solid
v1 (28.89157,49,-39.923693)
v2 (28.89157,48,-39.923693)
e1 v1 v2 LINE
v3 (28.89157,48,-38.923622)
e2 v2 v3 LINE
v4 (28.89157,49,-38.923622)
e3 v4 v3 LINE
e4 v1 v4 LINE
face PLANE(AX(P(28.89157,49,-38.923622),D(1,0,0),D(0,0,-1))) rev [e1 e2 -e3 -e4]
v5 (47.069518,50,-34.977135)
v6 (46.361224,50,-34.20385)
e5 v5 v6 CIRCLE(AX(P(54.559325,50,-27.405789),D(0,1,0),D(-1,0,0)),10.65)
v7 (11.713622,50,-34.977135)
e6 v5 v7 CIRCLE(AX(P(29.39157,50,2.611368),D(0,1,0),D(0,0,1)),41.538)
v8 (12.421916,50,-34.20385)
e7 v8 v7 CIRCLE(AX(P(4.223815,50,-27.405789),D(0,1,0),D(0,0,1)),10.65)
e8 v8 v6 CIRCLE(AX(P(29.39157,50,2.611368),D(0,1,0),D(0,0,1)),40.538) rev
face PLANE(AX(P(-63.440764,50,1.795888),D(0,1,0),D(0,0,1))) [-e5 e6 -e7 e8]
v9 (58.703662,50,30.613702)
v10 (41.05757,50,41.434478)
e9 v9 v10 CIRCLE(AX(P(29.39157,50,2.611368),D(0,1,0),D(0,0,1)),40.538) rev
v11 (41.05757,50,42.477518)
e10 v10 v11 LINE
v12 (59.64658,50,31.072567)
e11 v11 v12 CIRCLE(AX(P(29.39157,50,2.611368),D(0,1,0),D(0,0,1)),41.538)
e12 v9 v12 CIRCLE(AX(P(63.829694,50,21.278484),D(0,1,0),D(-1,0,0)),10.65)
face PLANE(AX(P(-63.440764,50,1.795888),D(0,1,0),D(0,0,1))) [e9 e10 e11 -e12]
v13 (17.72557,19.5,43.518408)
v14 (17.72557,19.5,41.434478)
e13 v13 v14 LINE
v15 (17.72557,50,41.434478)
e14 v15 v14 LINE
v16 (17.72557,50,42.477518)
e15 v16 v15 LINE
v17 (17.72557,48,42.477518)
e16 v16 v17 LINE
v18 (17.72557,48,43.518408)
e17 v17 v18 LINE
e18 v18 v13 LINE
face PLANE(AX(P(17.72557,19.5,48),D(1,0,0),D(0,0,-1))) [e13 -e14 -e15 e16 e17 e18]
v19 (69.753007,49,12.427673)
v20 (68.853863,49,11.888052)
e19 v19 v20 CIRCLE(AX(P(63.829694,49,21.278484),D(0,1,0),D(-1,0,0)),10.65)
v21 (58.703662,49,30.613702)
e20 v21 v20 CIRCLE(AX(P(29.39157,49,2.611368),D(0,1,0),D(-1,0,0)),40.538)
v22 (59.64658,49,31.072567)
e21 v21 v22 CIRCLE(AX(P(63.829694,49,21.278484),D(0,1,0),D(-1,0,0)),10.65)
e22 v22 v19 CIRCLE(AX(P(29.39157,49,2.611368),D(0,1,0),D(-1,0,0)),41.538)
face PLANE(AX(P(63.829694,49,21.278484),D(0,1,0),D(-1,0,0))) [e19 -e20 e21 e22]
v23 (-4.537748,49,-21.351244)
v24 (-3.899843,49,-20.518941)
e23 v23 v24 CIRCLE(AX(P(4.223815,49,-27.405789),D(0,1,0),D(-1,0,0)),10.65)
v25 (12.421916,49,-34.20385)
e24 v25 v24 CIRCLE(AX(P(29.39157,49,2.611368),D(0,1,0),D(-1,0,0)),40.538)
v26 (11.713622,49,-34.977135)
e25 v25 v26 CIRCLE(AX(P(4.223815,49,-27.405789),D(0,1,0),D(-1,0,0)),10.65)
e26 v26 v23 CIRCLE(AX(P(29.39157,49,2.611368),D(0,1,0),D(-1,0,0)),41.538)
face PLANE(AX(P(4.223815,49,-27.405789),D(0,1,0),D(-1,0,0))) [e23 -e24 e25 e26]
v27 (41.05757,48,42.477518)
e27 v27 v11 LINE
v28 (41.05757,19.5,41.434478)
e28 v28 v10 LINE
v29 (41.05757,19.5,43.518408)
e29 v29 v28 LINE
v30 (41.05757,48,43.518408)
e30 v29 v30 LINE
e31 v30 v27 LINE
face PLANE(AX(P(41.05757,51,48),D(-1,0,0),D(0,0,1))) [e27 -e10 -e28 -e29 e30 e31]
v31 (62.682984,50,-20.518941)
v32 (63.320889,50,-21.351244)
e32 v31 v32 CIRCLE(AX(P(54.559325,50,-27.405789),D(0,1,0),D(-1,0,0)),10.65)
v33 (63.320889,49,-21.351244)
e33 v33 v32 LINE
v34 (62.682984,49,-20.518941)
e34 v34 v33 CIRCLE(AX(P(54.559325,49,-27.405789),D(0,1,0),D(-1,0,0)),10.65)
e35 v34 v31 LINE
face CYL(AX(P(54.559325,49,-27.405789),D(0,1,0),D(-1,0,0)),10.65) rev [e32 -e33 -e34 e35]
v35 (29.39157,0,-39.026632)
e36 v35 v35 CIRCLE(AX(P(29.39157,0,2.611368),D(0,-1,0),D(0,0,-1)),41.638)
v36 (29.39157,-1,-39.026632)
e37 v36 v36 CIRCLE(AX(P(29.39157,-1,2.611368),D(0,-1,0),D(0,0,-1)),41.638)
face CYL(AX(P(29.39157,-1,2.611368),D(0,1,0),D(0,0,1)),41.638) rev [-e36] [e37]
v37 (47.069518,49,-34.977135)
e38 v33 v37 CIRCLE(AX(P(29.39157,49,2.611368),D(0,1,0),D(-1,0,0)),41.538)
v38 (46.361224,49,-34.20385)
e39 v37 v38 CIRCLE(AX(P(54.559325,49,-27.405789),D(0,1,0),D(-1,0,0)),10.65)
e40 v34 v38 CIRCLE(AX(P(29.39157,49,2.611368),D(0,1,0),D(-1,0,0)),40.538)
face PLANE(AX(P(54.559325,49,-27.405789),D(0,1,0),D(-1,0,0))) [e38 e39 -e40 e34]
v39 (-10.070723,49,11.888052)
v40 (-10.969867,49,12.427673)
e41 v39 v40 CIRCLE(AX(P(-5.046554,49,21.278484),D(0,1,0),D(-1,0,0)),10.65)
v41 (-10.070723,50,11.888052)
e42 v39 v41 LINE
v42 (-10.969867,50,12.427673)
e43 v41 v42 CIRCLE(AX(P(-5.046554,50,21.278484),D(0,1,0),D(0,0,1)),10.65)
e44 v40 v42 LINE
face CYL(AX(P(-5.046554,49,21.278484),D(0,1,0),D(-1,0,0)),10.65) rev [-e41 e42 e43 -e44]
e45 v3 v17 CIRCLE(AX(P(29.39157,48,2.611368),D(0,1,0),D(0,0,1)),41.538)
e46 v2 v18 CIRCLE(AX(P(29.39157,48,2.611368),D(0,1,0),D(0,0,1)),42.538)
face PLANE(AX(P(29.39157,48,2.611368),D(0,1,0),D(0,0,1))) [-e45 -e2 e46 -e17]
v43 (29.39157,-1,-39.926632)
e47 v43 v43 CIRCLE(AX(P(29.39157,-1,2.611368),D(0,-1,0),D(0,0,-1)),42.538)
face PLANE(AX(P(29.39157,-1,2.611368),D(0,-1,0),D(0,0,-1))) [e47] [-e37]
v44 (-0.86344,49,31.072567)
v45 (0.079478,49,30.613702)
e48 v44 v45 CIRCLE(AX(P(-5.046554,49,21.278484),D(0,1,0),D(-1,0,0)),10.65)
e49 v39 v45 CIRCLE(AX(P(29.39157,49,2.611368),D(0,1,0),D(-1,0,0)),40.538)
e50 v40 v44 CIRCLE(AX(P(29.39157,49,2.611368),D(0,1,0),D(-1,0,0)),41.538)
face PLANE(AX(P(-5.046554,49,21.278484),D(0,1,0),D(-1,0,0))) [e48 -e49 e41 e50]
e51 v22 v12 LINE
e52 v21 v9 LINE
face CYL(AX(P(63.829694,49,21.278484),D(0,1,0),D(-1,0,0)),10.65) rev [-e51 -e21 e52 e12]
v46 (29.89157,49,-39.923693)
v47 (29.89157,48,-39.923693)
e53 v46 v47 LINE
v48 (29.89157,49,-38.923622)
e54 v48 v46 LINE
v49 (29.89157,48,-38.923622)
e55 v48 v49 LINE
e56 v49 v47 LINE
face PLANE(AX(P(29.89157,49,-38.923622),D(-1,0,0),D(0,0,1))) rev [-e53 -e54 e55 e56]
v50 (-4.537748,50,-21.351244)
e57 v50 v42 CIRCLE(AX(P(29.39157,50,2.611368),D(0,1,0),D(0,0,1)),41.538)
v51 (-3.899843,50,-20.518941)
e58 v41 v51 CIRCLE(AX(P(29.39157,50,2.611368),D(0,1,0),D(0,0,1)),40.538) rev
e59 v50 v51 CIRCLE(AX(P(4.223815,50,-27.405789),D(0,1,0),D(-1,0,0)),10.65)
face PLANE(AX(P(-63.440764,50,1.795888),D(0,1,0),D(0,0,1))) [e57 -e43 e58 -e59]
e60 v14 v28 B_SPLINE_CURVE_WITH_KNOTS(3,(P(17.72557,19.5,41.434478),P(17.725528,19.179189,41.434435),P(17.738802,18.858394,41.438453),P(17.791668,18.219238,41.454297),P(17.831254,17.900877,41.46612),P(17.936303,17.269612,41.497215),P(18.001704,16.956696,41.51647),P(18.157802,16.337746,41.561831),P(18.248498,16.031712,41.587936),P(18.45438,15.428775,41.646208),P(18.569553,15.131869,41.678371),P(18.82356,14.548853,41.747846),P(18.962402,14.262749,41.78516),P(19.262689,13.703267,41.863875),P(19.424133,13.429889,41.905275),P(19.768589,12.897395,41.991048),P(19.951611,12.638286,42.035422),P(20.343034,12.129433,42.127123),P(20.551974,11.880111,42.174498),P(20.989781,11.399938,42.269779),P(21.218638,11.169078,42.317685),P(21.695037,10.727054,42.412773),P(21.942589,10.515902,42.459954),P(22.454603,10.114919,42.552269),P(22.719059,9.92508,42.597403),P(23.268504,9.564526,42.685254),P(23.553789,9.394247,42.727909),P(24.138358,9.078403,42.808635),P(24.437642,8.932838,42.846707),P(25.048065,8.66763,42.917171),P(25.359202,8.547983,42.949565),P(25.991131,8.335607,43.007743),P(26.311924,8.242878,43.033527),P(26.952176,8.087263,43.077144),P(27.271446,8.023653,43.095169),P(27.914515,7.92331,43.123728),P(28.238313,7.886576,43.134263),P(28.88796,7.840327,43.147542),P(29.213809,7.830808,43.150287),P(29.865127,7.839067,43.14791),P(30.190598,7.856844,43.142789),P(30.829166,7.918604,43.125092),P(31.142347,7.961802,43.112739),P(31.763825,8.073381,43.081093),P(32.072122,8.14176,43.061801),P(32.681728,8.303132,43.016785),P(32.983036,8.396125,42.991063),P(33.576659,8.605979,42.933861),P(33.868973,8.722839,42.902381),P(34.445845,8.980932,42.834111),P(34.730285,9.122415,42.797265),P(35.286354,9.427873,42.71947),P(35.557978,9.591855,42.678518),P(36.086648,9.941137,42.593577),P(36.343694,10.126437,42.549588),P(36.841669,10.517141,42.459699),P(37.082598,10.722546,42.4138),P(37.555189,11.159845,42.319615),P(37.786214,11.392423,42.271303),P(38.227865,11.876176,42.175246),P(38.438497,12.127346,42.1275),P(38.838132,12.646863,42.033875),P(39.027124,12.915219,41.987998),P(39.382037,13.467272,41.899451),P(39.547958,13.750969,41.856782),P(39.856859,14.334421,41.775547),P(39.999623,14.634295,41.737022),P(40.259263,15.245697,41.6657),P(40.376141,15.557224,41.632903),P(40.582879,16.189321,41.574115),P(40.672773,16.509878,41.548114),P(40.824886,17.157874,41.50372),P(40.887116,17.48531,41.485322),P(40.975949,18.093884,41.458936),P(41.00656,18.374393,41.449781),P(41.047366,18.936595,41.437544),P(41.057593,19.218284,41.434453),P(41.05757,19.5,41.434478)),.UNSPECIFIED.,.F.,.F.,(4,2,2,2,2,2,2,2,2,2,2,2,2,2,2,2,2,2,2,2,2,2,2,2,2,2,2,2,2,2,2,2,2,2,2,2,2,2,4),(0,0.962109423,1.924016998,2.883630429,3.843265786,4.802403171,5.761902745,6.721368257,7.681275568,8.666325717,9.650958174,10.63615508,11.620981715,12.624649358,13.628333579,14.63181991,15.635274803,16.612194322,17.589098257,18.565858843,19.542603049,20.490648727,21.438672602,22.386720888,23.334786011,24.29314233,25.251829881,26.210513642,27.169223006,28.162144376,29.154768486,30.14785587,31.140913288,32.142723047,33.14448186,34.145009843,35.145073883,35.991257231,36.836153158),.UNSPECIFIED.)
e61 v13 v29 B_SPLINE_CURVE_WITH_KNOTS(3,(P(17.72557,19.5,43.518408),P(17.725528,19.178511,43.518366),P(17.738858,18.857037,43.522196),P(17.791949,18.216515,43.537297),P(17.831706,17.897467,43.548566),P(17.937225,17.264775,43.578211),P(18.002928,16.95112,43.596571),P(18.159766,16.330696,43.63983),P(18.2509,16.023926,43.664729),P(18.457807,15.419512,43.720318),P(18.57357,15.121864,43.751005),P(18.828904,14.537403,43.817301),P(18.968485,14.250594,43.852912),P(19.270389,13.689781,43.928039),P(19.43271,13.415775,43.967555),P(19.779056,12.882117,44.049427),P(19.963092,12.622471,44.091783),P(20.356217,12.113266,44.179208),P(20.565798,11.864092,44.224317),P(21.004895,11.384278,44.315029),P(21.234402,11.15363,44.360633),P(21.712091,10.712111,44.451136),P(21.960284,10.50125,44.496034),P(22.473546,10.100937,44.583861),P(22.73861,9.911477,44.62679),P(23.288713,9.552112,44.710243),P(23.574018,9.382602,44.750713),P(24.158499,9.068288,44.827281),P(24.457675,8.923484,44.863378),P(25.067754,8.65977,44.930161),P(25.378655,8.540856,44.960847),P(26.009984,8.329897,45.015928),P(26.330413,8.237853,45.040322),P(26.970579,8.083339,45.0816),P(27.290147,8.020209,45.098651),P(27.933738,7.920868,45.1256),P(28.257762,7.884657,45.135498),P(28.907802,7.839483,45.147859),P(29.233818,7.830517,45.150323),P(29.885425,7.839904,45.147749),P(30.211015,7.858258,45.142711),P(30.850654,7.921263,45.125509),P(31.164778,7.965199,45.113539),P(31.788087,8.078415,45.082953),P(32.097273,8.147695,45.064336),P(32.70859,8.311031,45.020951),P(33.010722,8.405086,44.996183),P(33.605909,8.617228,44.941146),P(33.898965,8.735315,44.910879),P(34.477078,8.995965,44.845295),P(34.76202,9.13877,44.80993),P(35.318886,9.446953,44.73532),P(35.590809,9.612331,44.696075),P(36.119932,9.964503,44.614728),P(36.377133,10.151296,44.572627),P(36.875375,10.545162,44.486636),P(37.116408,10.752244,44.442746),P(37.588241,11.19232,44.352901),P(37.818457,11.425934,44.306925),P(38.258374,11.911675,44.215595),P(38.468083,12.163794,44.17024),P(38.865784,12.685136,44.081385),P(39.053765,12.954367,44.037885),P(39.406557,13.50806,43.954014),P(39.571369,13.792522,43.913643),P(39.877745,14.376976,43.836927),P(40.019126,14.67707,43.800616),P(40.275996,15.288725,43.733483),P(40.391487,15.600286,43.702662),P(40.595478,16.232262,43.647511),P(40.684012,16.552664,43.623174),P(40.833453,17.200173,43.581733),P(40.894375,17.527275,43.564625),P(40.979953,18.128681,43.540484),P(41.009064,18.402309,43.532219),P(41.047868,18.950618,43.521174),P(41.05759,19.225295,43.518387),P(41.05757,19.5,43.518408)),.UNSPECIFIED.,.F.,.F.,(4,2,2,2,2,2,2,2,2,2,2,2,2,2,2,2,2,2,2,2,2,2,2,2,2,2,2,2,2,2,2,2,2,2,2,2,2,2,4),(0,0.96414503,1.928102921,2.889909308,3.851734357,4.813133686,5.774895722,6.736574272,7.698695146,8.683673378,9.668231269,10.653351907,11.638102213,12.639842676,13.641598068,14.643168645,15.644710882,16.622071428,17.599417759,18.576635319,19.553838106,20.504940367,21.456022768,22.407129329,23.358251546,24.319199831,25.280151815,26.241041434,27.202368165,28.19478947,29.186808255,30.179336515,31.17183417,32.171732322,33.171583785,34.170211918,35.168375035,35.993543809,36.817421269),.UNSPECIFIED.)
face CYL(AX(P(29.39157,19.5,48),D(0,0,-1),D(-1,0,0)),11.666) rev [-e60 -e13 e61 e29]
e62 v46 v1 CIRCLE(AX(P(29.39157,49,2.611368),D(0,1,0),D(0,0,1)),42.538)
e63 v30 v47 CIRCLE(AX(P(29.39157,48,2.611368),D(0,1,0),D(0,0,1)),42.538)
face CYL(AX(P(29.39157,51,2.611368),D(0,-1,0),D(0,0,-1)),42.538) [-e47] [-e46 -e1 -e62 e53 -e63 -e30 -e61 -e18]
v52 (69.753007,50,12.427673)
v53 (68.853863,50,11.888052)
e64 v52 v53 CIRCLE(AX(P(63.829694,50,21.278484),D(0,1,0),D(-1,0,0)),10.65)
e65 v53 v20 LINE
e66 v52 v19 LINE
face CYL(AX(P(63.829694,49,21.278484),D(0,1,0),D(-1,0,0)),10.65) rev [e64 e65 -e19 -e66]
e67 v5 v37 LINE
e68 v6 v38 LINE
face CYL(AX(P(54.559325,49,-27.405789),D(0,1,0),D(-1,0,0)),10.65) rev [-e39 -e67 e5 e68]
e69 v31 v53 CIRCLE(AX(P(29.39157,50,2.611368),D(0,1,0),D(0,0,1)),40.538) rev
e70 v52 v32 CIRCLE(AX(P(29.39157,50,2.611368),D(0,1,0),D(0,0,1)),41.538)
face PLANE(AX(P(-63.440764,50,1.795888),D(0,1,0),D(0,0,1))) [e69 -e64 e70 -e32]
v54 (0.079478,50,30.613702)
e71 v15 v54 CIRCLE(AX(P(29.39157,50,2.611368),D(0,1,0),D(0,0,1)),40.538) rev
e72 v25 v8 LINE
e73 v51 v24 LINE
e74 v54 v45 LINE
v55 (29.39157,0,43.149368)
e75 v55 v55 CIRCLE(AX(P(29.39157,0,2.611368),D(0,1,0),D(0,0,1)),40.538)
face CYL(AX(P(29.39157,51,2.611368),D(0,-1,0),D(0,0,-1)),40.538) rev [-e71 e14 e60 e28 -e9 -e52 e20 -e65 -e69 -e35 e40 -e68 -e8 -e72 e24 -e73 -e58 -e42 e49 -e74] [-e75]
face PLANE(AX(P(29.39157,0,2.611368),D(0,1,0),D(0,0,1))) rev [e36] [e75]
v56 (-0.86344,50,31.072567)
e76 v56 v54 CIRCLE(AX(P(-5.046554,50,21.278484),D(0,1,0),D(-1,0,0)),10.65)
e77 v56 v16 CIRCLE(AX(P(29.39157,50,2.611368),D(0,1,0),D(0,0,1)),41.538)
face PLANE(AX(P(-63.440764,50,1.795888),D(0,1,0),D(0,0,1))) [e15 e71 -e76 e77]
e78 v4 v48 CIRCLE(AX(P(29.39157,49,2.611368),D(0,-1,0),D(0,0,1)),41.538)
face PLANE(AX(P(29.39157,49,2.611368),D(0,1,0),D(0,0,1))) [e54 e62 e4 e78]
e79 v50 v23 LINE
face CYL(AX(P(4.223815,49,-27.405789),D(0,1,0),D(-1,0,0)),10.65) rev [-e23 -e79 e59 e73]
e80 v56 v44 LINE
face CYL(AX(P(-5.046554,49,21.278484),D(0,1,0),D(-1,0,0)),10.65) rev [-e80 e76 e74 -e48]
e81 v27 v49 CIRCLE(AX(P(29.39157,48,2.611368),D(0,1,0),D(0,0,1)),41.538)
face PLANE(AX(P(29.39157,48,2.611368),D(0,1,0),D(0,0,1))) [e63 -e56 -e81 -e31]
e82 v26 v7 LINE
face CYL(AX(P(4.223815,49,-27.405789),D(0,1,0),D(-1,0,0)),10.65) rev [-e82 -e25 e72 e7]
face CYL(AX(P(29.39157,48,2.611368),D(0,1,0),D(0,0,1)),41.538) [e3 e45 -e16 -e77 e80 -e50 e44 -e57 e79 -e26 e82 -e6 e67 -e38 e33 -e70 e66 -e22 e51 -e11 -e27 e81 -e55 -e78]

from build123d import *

# Parameters (mm, degrees)
SKETCH2_R           = 42.538
SKETCH2_R_2         = 40.538
BOSS_EXTRUDE1_DEPTH = 51
CUT_EXTRUDE1_DEPTH  = 48
CUT_EXTRUDE3_START  = -1
CUT_EXTRUDE3_DEPTH  = 1
SKETCH29_R          = 10.65
CUT_EXTRUDE16_DEPTH = 1
CUT_EXTRUDE17_START = -2
SKETCH30_R          = 42.538
SKETCH30_R_2        = 41.538
CUT_EXTRUDE17_DEPTH = 2
BOSS_EXTRUDE3_DEPTH = 1
BOSS_EXTRUDE4_START = 1
SKETCH33_R          = 42.538
SKETCH33_R_2        = 41.638
BOSS_EXTRUDE4_DEPTH = 1


# Read off the part's stored shape, not the designer's step: Cut-Extrude3
with BuildPart() as part:
    # Sketch2 → Boss-Extrude1 (new body)
    with BuildSketch(Plane(origin=(0, 0, 0), x_dir=(-1, 0, 0), z_dir=(0, 1, 0))):
        with Locations(Location((-29.391570254, 2.611368154, 0), (0, 0, 90))):
            Circle(SKETCH2_R)
        with Locations(Location((-29.391570254, 2.611368154, 0), (0, 0, 90))):
            Circle(SKETCH2_R_2, mode=Mode.SUBTRACT)
    extrude(amount=BOSS_EXTRUDE1_DEPTH)

    # Sketch3 → Cut-Extrude1 (cut)
    with BuildSketch(Plane.XY):
        with BuildLine():
            Line((17.725570254, 19.5), (17.725570254, 51))
            Line((17.725570254, 51), (41.057570254, 51))
            Line((41.057570254, 51), (41.057570254, 19.5))
            ThreePointArc((41.057570254, 19.5), (29.391570254, 7.834), (17.725570254, 19.5))
        make_face()
    extrude(amount=CUT_EXTRUDE1_DEPTH, mode=Mode.SUBTRACT)

    # Cut-Extrude3 outline → Cut-Extrude3 (cut)
    with BuildSketch(Plane(origin=(0, 51, 0), x_dir=(1, 0, 0), z_dir=(0, 1, 0)).offset(CUT_EXTRUDE3_START)):
        with BuildLine():
            ThreePointArc((41.057570254, -43.518407744), (29.391570254, 39.926631846), (17.725570254, -43.518407744))
            Line((17.725570254, -43.518407744), (17.725570254, -41.434478385))
            ThreePointArc((17.725570254, -41.434478385), (29.391570254, 37.926631846), (41.057570254, -41.434478385))
            Line((41.057570254, -41.434478385), (41.057570254, -43.518407744))
        make_face()
    extrude(amount=CUT_EXTRUDE3_DEPTH, mode=Mode.SUBTRACT)

    # Sketch29 → Cut-Extrude16 (cut)
    with BuildSketch(Plane(origin=(58.783140508, 50, 5.222736308), x_dir=(1, 0, 0), z_dir=(0, 1, 0))):
        with Locations((-54.559325107, 32.628524909)):
            Circle(SKETCH29_R)
        with Locations((-4.223815401, 32.628524909)):
            Circle(SKETCH29_R)
        with Locations((5.046553517, -16.055747722)):
            Circle(SKETCH29_R)
        with Locations((-63.829694025, -16.055747722)):
            Circle(SKETCH29_R)
    extrude(amount=-CUT_EXTRUDE16_DEPTH, mode=Mode.SUBTRACT)

    # Sketch30 → Cut-Extrude17 (cut)
    with BuildSketch(Plane(origin=(0, 50, 0), x_dir=(1, 0, 0), z_dir=(0, 1, 0)).offset(CUT_EXTRUDE17_START)):
        with Locations(Location((29.391570254, -2.611368154, 0), (0, 0, 285.917258926))):
            Circle(SKETCH30_R)
        with Locations((29.391570254, -2.611368154)):
            Circle(SKETCH30_R_2, mode=Mode.SUBTRACT)
    extrude(amount=CUT_EXTRUDE17_DEPTH, mode=Mode.SUBTRACT)

    # Sketch32 → Boss-Extrude3 (add)
    with BuildSketch(Plane(origin=(0, 48, 0), x_dir=(1, 0, 0), z_dir=(0, 1, 0))):
        with BuildLine():
            Line((29.891570254, 38.923622444), (29.891570254, 39.923693196))
            ThreePointArc((29.891570254, 39.923693196), (29.391570254, 39.926631846), (28.891570254, 39.923693196))
            Line((28.891570254, 39.923693196), (28.891570254, 38.923622444))
            ThreePointArc((28.891570254, 38.923622444), (29.391570254, 38.926631846), (29.891570254, 38.923622444))
        make_face()
    extrude(amount=BOSS_EXTRUDE3_DEPTH)

    # Sketch33 → Boss-Extrude4 (add)
    with BuildSketch(Plane.XZ.offset(BOSS_EXTRUDE4_START)):
        with Locations(Location((29.391570254, 2.611368154, 0), (0, 0, 270))):
            Circle(SKETCH33_R)
        with Locations(Location((29.391570254, 2.611368154, 0), (0, 0, 270))):
            Circle(SKETCH33_R_2, mode=Mode.SUBTRACT)
    extrude(amount=-BOSS_EXTRUDE4_DEPTH)


solid = part.part
